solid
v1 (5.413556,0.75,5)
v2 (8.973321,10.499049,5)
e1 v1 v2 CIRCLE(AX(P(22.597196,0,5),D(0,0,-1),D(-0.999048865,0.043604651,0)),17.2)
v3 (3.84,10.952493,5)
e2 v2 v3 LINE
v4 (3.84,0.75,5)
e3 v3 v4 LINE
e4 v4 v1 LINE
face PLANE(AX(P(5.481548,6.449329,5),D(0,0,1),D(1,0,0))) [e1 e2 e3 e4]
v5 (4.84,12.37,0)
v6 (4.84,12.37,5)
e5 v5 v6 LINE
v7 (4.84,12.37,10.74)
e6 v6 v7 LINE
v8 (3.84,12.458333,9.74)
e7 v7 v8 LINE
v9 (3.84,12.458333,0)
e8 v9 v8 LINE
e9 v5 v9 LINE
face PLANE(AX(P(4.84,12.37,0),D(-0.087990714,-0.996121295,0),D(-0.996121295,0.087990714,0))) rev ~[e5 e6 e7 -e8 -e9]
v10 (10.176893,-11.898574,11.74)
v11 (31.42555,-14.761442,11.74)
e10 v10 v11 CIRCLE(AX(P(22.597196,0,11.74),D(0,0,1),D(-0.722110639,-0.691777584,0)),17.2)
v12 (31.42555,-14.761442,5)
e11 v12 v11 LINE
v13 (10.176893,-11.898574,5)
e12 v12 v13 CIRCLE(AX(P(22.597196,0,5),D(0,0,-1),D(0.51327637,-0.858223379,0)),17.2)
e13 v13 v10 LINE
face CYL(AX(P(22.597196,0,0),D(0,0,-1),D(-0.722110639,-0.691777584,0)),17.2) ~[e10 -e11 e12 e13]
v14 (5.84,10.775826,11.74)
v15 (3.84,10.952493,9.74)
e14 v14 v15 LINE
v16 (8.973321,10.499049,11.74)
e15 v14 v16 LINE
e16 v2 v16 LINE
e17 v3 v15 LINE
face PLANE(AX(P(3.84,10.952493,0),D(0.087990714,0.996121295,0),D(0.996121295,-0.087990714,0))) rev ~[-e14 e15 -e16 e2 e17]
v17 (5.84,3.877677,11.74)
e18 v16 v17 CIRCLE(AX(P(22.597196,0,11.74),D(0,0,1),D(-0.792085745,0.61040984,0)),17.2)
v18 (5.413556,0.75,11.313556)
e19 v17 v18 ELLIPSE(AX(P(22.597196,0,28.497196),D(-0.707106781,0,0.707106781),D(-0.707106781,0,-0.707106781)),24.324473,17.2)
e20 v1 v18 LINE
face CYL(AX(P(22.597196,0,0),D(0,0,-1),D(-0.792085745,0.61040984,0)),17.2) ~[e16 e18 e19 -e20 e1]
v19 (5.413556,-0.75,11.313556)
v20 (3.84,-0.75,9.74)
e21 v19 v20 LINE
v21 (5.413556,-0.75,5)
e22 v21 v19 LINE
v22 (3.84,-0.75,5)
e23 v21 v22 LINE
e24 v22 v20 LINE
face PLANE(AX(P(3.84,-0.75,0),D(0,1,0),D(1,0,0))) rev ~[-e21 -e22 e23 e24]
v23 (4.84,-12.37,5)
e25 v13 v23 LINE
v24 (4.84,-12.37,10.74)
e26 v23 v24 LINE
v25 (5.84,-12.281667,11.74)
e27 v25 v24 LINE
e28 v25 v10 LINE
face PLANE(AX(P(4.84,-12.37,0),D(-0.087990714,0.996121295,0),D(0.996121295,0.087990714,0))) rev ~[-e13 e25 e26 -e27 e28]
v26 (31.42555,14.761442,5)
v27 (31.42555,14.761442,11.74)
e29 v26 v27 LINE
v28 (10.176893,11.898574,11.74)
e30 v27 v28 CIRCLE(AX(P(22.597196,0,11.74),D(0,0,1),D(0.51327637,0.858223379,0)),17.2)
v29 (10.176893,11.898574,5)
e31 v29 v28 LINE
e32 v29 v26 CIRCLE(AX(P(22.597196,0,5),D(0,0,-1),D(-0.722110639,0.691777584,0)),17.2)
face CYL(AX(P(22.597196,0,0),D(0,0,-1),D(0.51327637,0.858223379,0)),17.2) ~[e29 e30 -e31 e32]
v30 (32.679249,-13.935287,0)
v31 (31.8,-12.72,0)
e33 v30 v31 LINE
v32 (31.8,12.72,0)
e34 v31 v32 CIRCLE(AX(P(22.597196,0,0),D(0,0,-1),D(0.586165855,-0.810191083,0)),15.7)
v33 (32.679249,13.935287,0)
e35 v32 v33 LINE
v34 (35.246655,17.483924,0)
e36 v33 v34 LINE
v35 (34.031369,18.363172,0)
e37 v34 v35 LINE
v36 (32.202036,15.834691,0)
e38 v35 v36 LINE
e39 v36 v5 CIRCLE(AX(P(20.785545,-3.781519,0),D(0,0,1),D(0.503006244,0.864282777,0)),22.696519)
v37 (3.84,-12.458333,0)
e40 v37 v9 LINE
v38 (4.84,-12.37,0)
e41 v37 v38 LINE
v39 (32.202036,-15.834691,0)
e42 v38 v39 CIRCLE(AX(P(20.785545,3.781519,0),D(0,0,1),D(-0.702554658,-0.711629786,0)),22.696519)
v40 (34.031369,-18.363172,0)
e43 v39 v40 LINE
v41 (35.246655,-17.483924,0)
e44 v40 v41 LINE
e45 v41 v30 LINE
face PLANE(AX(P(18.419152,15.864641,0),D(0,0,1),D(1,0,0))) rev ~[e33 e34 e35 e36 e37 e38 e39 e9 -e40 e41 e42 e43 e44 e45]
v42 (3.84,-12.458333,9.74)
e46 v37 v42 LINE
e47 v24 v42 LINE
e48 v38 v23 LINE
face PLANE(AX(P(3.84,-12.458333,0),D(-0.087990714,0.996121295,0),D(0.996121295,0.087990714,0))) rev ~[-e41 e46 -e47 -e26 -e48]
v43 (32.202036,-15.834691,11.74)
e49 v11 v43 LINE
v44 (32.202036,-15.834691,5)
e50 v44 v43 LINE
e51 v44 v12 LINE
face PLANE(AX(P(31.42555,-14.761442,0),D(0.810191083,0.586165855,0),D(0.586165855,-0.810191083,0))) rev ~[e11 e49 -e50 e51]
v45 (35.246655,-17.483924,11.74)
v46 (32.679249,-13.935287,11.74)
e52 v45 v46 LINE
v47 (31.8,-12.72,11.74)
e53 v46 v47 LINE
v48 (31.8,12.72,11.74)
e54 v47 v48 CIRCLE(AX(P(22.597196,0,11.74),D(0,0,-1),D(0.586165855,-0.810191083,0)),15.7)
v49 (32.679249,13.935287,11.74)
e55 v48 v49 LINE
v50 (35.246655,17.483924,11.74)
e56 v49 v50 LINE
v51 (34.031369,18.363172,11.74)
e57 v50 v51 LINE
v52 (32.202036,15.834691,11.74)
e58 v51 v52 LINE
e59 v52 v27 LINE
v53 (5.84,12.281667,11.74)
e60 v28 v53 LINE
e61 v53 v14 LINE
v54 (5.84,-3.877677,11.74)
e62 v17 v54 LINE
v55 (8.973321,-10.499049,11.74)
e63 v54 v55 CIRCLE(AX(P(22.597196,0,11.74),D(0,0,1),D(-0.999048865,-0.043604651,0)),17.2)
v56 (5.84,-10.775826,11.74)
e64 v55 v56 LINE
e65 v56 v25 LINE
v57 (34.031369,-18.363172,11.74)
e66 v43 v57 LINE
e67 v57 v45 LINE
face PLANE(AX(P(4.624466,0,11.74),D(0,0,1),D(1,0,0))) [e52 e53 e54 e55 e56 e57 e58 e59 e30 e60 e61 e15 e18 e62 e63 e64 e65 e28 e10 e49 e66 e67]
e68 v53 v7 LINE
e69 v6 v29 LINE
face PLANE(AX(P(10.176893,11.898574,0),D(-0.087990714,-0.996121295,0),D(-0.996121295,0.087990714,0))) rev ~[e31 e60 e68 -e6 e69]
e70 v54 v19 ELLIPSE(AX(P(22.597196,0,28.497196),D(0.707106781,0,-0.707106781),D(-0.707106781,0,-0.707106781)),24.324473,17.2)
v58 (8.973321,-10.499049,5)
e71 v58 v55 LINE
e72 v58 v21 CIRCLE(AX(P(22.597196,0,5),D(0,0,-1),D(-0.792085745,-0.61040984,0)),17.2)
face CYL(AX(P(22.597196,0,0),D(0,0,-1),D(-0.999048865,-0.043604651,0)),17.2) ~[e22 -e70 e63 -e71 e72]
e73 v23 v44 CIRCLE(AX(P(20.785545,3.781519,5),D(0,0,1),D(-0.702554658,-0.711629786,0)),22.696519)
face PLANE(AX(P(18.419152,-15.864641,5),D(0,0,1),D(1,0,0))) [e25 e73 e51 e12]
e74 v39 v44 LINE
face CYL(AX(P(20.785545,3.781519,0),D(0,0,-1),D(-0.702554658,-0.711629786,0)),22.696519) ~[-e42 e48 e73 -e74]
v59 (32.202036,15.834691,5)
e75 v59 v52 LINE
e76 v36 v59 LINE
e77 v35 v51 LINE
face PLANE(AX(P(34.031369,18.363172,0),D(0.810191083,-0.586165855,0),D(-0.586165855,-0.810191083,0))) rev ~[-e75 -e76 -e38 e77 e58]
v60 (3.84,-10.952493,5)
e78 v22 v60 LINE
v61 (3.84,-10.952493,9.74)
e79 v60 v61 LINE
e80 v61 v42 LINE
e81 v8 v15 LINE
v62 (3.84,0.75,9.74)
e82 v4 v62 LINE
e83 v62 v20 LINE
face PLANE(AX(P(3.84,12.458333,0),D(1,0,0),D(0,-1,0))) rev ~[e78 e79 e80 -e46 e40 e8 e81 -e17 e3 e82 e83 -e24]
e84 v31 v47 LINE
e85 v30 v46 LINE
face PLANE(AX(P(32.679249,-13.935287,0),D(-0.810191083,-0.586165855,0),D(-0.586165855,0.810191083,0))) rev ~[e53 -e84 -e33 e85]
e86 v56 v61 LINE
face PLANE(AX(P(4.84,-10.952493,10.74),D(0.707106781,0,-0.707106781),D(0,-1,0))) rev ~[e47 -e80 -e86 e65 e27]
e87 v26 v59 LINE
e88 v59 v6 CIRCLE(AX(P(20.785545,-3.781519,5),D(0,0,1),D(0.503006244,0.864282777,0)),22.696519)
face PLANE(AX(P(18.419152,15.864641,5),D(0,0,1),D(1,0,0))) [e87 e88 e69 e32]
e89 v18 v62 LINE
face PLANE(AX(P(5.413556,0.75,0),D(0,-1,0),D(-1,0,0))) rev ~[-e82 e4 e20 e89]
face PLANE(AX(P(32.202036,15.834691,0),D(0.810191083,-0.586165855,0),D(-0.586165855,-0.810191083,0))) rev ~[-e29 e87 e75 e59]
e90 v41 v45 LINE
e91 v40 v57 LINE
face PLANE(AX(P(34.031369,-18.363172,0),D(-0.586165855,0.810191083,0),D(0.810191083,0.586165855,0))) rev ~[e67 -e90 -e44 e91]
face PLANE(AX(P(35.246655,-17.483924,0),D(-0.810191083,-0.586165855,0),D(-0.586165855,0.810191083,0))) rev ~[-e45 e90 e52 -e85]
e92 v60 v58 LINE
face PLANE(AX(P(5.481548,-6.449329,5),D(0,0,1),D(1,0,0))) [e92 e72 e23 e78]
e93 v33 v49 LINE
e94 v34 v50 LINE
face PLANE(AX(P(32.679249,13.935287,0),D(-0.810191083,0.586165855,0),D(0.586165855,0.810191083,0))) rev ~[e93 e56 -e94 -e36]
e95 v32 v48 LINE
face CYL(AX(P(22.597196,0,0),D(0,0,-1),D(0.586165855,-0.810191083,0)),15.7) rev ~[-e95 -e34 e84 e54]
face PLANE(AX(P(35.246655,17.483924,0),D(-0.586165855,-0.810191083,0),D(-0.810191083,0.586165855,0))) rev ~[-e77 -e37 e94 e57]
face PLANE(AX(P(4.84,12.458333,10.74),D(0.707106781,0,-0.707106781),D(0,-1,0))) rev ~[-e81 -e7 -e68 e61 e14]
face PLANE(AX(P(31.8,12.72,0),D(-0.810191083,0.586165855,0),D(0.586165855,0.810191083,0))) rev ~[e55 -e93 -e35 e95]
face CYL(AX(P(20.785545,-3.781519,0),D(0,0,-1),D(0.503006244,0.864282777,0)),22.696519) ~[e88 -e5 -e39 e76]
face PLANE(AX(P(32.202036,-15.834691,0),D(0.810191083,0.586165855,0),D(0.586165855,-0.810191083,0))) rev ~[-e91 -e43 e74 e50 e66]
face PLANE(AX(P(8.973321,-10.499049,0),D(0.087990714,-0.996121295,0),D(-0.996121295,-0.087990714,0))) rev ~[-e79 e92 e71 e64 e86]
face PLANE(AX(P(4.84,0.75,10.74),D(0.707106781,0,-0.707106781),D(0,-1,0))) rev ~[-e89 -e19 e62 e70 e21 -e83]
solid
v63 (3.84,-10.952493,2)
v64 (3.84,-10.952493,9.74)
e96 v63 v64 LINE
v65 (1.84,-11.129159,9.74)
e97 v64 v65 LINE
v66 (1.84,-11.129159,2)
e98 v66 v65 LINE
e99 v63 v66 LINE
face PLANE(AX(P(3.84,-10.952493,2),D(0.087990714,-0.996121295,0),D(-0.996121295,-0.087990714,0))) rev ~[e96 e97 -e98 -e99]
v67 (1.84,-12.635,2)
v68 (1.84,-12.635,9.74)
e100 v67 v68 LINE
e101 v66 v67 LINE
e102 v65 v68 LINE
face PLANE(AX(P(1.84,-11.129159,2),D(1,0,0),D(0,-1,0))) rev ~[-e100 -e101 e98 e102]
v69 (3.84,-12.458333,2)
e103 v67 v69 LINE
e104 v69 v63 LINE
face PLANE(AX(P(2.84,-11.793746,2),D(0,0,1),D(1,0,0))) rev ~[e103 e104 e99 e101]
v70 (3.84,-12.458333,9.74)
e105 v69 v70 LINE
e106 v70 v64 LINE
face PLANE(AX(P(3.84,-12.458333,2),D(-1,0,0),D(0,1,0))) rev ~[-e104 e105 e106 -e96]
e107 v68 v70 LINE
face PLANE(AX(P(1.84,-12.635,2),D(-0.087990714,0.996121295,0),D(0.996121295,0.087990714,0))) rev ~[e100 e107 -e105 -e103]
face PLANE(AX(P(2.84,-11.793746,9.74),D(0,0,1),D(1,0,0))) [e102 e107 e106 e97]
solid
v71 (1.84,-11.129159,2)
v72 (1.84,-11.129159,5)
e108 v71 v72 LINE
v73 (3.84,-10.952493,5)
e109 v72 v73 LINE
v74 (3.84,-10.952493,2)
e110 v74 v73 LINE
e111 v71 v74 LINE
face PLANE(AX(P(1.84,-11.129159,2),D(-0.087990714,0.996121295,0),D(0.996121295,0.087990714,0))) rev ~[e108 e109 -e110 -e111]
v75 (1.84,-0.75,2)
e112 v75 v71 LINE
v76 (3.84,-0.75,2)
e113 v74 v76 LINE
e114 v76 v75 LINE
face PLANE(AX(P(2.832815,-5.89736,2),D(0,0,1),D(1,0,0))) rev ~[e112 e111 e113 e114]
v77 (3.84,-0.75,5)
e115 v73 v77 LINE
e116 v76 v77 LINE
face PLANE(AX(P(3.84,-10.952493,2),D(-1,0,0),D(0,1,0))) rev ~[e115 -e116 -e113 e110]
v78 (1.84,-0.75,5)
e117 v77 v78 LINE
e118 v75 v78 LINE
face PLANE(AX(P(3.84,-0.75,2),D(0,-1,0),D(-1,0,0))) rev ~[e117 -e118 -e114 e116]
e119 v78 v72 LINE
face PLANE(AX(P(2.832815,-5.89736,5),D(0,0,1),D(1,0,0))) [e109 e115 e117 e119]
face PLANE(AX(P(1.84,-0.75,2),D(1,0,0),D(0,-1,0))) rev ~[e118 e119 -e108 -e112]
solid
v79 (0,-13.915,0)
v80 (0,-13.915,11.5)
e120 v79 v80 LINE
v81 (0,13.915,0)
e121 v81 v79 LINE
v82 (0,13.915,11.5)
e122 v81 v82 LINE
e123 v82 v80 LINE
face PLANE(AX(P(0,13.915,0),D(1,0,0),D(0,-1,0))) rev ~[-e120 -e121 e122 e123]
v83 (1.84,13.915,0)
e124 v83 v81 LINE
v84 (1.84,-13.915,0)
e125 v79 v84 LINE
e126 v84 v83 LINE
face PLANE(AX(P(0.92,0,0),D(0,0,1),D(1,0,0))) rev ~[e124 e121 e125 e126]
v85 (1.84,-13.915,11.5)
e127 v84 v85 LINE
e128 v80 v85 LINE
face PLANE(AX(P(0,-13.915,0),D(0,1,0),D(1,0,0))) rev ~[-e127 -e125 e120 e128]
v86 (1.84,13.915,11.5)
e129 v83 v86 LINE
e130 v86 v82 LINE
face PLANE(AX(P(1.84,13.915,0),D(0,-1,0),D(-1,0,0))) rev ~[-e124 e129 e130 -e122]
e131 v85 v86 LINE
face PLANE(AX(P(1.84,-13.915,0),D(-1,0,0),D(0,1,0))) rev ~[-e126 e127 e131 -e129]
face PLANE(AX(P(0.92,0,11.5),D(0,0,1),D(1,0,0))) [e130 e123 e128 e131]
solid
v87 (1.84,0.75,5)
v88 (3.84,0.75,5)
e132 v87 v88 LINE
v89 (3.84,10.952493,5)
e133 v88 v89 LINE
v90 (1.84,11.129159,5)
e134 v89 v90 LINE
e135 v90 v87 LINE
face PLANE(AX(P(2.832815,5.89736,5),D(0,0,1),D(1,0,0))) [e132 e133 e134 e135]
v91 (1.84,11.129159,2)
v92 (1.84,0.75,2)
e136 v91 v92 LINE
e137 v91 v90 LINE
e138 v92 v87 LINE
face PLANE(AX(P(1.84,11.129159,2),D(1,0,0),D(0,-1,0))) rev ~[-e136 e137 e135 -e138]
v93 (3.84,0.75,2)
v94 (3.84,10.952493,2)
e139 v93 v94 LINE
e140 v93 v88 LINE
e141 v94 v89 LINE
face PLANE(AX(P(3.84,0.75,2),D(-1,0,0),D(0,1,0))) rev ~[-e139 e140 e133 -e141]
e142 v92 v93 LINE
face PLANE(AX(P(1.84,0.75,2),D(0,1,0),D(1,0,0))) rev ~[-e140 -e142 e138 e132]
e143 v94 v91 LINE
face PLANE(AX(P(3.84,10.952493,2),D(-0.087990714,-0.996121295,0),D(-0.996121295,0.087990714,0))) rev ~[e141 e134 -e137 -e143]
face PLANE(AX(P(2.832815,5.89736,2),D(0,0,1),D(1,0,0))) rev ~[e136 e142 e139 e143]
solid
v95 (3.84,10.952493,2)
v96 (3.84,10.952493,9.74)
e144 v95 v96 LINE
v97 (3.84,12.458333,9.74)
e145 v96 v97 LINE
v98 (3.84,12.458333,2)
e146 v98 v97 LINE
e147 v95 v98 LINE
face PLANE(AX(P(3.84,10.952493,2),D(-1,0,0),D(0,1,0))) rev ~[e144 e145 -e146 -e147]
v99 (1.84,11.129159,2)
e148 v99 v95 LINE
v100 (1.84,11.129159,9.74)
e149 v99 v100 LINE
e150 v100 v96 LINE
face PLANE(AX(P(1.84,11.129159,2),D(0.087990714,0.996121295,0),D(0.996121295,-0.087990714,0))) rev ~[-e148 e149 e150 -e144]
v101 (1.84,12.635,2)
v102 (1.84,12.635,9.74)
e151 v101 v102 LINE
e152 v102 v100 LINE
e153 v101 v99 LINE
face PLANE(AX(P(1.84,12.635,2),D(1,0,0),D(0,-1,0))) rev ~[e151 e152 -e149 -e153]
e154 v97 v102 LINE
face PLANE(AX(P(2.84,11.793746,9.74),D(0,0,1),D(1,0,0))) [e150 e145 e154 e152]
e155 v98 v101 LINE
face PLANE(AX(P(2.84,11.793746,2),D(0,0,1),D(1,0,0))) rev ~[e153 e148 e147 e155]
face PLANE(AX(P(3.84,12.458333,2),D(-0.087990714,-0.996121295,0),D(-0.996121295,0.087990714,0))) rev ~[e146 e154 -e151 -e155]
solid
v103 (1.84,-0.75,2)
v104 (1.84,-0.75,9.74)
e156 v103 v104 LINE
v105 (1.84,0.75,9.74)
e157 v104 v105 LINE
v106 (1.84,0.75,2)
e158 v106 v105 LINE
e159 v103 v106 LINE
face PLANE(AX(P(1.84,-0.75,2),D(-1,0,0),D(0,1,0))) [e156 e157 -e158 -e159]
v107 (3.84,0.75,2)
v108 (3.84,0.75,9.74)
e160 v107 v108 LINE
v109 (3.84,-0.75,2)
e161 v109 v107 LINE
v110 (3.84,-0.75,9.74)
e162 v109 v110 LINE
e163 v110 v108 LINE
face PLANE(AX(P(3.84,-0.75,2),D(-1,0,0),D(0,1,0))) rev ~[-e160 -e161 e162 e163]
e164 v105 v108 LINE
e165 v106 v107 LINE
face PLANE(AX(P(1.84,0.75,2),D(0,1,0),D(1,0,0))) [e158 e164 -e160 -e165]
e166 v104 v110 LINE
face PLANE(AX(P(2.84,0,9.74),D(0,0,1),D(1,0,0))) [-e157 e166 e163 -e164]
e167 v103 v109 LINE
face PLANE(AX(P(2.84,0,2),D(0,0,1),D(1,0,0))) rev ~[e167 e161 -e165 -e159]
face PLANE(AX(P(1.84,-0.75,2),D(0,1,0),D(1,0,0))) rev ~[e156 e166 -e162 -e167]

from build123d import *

# Parameters (mm, degrees)
F1_DEPTH = 11.74
F2_DEPTH = 5
F3_START = 2
F0_W     = 2
F0_H     = 1.5
F3_DEPTH = 7.74
F4_START = 2
F4_DEPTH = 3
F5_SIZE  = 2
F6_DEPTH = 11.5


# Not quite as in the source:
# - a feature names something its author has since deleted; it is built from what else it names


with BuildPart() as f1:
    # F0 (on Top) → F1 (new body)
    with BuildSketch(Plane.XY):
        with BuildLine():
            Line((5.4135556037, 0.75), (3.84, 0.75))
            Line((3.84, 0.75), (3.84, -0.75))
            Line((3.84, -0.75), (5.4135556037, -0.75))
            ThreePointArc((5.4135556037, -0.75), (5.3971960795, 0), (5.4135556037, 0.75))
        make_face()
        with BuildLine():
            ThreePointArc((10.1768930953, 11.8985744432), (9.5563193063, 11.2149691478), (8.9733212638, 10.499049243))
            ThreePointArc((8.9733212638, 10.499049243), (6.4405646269, 5.8994287949), (5.4135556037, 0.75))
            ThreePointArc((5.4135556037, 0.75), (5.3971960795, 0), (5.4135556037, -0.75))
            ThreePointArc((5.4135556037, -0.75), (6.4405646269, -5.8994287949), (8.9733212638, -10.499049243))
            ThreePointArc((8.9733212638, -10.499049243), (9.5563193063, -11.2149691478), (10.1768930953, -11.8985744432))
            ThreePointArc((10.1768930953, -11.8985744432), (20.3005620248, -17.0459811105), (31.425549646, -14.7614421147))
            ThreePointArc((31.425549646, -14.7614421147), (32.0614181574, -14.3620507052), (32.6792487822, -13.9352866242))
            Line((32.6792487822, -13.9352866242), (31.8, -12.72))
            ThreePointArc((31.8, -12.72), (6.8971960795, 0), (31.8, 12.72))
            Line((31.8, 12.72), (32.6792487822, 13.9352866242))
            ThreePointArc((32.6792487822, 13.9352866242), (32.0614181574, 14.3620507052), (31.425549646, 14.7614421147))
            ThreePointArc((31.425549646, 14.7614421147), (20.3005620248, 17.0459811105), (10.1768930953, 11.8985744432))
        make_face()
        with BuildLine():
            Line((31.425549646, -14.7614421147), (32.2020357723, -15.8346914866))
            Line((32.2020357723, -15.8346914866), (34.0313686021, -18.3631723491))
            Line((34.0313686021, -18.3631723491), (35.2466552263, -17.4839235669))
            Line((35.2466552263, -17.4839235669), (32.6792487822, -13.9352866242))
            ThreePointArc((32.6792487822, -13.9352866242), (32.0614181574, -14.3620507052), (31.425549646, -14.7614421147))
        make_face()
        with BuildLine():
            Line((34.0313686021, 18.3631723491), (32.2020357723, 15.8346914866))
            Line((32.2020357723, 15.8346914866), (31.425549646, 14.7614421147))
            ThreePointArc((31.425549646, 14.7614421147), (32.0614181574, 14.3620507052), (32.6792487822, 13.9352866242))
            Line((32.6792487822, 13.9352866242), (35.2466552263, 17.4839235669))
            Line((35.2466552263, 17.4839235669), (34.0313686021, 18.3631723491))
        make_face()
        with BuildLine():
            Line((4.84, 12.37), (3.84, 12.4583333333))
            Line((3.84, 12.4583333333), (3.84, 10.9524926213))
            Line((3.84, 10.9524926213), (8.9733212638, 10.499049243))
            ThreePointArc((8.9733212638, 10.499049243), (9.5563193063, 11.2149691478), (10.1768930953, 11.8985744432))
            Line((10.1768930953, 11.8985744432), (4.84, 12.37))
        make_face()
        with BuildLine():
            Line((3.84, -10.9524926213), (3.84, -12.4583333333))
            Line((3.84, -12.4583333333), (4.84, -12.37))
            Line((4.84, -12.37), (10.1768930953, -11.8985744432))
            ThreePointArc((10.1768930953, -11.8985744432), (9.5563193063, -11.2149691478), (8.9733212638, -10.499049243))
            Line((8.9733212638, -10.499049243), (3.84, -10.9524926213))
        make_face()
    extrude(amount=F1_DEPTH)

    # F0 (on Top) → F2 (join)
    with BuildSketch(Plane.XY):
        with BuildLine():
            ThreePointArc((32.2020357723, 15.8346914866), (17.9343865068, 18.7352052196), (4.84, 12.37))
            Line((4.84, 12.37), (10.1768930953, 11.8985744432))
            ThreePointArc((10.1768930953, 11.8985744432), (20.3005620248, 17.0459811105), (31.425549646, 14.7614421147))
            Line((31.425549646, 14.7614421147), (32.2020357723, 15.8346914866))
        make_face()
        with BuildLine():
            Line((10.1768930953, -11.8985744432), (4.84, -12.37))
            ThreePointArc((4.84, -12.37), (17.9343865068, -18.7352052196), (32.2020357723, -15.8346914866))
            Line((32.2020357723, -15.8346914866), (31.425549646, -14.7614421147))
            ThreePointArc((31.425549646, -14.7614421147), (20.3005620248, -17.0459811105), (10.1768930953, -11.8985744432))
        make_face()
        with BuildLine():
            Line((3.84, -0.75), (3.84, -10.9524926213))
            Line((3.84, -10.9524926213), (8.9733212638, -10.499049243))
            ThreePointArc((8.9733212638, -10.499049243), (6.4405646269, -5.8994287949), (5.4135556037, -0.75))
            Line((5.4135556037, -0.75), (3.84, -0.75))
        make_face()
        with BuildLine():
            Line((8.9733212638, 10.499049243), (3.84, 10.9524926213))
            Line((3.84, 10.9524926213), (3.84, 0.75))
            Line((3.84, 0.75), (5.4135556037, 0.75))
            ThreePointArc((5.4135556037, 0.75), (6.4405646269, 5.8994287949), (8.9733212638, 10.499049243))
        make_face()
    extrude(amount=F2_DEPTH)

    # F5
    f5_edges = [f1.edges().sort_by_distance(p)[0] for p in [
        (3.84, 0, 11.74),
        (3.84, -11.705413, 11.74),
        (3.84, 11.705413, 11.74),
    ]]
    chamfer(f5_edges, length=F5_SIZE)


with BuildPart() as f3:
    # F0 (on Top) → F3 (new body)
    with BuildSketch(Plane.XY.offset(F3_START)):
        with Locations((2.84, 0)):
            Rectangle(F0_W, F0_H)
    extrude(amount=F3_DEPTH)


with BuildPart() as f3b:
    # F0 (on Top) → F3, piece 2 (new body)
    with BuildSketch(Plane.XY.offset(F3_START)):
        Polygon((1.84, -11.129159288), (1.84, -12.635), (3.84, -12.4583333333), (3.84, -10.9524926213), align=None)
    extrude(amount=F3_DEPTH)


with BuildPart() as f3c:
    # F0 (on Top) → F3, piece 3 (new body)
    with BuildSketch(Plane.XY.offset(F3_START)):
        Polygon((3.84, 12.4583333333), (1.84, 12.635), (1.84, 11.129159288), (3.84, 10.9524926213), align=None)
    extrude(amount=F3_DEPTH)


with BuildPart() as f4:
    # F0 (on Top) → F4 (new body)
    with BuildSketch(Plane.XY.offset(F4_START)):
        Polygon((3.84, 10.9524926213), (1.84, 11.129159288), (1.84, 0.75), (3.84, 0.75), align=None)
    extrude(amount=F4_DEPTH)


with BuildPart() as f4b:
    # F0 (on Top) → F4, piece 2 (new body)
    with BuildSketch(Plane.XY.offset(F4_START)):
        Polygon((1.84, -0.75), (1.84, -11.129159288), (3.84, -10.9524926213), (3.84, -0.75), align=None)
    extrude(amount=F4_DEPTH)


with BuildPart() as f6:
    # F0 (on Top) → F6 (new body)
    with BuildSketch(Plane.XY):
        Polygon((1.84, 13.915), (0, 13.915), (0, -13.915), (1.84, -13.915), (1.84, -12.635), (1.84, -11.129159288), (1.84, -0.75), (1.84, 0.75), (1.84, 11.129159288), (1.84, 12.635), align=None)
    extrude(amount=F6_DEPTH)


solid = Compound([f1.part, f3.part, f3b.part, f3c.part, f4.part, f4b.part, f6.part])
